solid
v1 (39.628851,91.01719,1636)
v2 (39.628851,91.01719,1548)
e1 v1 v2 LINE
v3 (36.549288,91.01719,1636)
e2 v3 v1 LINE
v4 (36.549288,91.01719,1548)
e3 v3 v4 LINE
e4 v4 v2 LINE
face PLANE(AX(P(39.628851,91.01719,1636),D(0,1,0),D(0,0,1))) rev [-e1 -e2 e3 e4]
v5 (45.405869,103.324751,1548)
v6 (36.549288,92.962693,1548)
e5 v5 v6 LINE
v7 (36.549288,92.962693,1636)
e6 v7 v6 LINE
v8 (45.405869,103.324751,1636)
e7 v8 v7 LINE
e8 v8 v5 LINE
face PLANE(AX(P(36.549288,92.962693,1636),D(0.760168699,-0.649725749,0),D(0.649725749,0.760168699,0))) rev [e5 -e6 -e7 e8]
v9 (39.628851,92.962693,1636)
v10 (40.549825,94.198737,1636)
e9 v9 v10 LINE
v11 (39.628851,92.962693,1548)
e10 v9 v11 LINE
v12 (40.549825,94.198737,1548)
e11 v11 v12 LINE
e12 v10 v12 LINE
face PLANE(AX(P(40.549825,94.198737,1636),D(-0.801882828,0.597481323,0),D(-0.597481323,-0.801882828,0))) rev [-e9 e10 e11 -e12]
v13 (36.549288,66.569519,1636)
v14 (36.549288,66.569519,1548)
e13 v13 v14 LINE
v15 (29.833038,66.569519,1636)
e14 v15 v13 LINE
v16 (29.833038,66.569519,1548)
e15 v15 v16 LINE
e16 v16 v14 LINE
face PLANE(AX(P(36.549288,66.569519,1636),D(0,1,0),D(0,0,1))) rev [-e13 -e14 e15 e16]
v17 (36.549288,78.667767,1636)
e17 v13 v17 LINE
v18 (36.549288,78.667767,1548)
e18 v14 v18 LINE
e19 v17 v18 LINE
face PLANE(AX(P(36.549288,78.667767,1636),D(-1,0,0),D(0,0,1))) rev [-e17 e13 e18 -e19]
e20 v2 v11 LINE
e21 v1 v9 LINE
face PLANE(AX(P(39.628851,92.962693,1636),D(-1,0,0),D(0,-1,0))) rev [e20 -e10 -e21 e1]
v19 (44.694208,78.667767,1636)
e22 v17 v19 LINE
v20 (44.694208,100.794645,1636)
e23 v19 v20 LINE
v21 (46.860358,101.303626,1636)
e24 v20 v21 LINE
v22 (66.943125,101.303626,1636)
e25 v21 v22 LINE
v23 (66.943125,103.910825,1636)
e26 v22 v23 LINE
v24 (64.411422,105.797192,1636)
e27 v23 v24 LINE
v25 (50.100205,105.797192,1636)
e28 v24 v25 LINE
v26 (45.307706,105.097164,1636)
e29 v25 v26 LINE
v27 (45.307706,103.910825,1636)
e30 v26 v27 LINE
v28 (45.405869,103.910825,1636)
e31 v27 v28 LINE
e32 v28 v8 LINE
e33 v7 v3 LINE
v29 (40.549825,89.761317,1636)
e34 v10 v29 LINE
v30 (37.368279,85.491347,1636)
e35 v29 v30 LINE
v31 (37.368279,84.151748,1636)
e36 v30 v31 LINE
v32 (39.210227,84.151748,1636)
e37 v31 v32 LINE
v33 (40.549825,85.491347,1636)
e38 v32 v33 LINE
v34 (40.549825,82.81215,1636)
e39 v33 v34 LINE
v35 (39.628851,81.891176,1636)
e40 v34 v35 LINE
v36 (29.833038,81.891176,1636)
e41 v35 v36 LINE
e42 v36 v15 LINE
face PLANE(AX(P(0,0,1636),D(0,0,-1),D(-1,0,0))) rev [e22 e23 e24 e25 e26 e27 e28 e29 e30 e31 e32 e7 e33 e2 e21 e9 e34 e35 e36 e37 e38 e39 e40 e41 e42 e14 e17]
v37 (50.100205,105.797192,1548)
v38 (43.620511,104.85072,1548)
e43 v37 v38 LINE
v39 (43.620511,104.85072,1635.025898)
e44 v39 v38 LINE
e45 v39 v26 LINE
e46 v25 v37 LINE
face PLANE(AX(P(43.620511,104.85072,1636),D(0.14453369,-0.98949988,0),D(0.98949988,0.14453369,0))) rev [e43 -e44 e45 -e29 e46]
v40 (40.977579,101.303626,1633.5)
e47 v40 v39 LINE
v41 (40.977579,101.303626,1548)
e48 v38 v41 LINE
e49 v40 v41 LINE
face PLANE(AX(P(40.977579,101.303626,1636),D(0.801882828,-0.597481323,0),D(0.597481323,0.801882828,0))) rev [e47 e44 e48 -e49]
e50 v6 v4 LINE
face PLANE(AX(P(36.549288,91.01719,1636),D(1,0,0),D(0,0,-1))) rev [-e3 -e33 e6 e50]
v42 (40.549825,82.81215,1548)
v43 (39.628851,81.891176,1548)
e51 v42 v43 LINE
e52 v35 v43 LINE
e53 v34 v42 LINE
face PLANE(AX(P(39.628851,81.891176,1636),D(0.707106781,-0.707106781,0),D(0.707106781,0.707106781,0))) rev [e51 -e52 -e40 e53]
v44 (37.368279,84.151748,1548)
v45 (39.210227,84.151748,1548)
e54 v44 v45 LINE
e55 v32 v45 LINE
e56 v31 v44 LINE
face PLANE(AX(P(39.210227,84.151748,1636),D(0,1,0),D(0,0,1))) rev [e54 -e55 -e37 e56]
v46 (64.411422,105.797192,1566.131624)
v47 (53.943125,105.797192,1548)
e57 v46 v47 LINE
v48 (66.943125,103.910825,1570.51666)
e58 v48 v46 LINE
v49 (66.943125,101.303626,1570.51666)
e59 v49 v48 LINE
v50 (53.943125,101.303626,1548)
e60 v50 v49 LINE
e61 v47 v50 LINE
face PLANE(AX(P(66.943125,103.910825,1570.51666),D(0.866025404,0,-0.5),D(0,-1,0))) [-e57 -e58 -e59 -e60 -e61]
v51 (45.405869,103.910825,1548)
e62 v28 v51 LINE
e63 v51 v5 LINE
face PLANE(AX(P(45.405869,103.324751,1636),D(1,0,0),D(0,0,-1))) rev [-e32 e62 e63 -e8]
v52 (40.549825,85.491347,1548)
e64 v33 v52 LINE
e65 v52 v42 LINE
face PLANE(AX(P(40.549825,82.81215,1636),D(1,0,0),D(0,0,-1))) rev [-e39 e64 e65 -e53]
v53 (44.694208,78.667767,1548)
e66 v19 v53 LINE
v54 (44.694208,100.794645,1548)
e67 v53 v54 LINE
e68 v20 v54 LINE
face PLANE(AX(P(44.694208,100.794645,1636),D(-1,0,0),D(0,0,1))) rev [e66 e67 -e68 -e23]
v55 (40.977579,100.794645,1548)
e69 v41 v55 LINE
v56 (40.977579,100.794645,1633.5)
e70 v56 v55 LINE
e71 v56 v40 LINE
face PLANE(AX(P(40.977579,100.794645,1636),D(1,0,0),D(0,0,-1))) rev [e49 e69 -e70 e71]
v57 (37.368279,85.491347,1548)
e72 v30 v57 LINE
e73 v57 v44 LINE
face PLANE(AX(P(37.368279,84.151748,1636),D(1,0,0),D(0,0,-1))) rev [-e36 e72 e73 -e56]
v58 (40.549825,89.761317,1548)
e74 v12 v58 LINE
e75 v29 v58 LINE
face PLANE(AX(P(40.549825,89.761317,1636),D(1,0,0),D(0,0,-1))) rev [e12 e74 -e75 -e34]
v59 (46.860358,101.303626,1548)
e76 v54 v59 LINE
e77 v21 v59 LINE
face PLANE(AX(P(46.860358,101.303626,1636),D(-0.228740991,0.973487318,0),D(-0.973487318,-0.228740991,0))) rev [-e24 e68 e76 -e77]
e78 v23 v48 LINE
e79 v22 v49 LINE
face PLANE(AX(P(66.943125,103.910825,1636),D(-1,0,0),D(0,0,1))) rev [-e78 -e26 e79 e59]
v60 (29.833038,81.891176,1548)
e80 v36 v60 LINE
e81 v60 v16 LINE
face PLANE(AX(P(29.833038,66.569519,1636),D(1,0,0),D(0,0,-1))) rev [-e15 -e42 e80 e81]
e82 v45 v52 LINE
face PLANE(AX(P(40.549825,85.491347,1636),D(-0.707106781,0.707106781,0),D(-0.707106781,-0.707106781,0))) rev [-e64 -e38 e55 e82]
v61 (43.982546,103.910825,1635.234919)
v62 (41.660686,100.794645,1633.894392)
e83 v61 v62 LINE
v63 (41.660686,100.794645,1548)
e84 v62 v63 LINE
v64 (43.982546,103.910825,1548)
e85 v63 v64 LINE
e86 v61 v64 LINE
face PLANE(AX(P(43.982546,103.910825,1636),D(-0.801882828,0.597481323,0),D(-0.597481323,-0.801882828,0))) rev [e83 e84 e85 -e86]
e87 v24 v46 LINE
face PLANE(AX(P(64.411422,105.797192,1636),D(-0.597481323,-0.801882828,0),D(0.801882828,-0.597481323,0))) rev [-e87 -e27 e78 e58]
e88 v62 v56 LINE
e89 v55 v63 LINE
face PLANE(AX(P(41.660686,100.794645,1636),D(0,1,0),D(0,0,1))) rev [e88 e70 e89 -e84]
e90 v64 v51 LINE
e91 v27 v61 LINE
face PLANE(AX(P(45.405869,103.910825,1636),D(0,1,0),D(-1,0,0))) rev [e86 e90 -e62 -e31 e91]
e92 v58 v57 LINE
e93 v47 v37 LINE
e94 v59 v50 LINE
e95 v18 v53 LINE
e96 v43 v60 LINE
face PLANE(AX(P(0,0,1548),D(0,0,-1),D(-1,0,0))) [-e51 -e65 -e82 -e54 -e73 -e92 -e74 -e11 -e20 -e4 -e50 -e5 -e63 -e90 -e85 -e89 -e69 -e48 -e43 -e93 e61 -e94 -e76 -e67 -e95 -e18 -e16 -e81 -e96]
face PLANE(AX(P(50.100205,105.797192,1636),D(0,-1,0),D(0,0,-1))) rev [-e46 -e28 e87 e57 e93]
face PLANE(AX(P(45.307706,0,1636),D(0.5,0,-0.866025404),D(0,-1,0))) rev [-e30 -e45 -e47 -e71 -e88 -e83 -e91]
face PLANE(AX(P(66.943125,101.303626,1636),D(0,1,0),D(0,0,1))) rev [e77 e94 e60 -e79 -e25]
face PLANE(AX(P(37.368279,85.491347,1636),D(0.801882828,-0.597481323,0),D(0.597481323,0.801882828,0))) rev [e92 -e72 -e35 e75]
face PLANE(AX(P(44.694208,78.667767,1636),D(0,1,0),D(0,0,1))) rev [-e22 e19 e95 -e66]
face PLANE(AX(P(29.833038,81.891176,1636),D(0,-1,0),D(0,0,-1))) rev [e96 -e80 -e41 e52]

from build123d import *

# Parameters (mm, degrees)
EXTRUDE_1_DEPTH  = 88
CHAMFER_1_SIZE   = 13
CHAMFER_1_SIZE2  = 22.516660498
CHAMFER_2_SIZE   = 4.330127019
CHAMFER_2_SIZE_2 = 2.5


with BuildPart() as part:
    # Эскиз1 → Бобышка-Вытянуть1 (new body)
    with BuildSketch(Plane.XY.offset(1548)):
        Polygon((36.549287829, 66.569518917), (29.833037542, 66.569518917), (29.833037542, 81.891176087), (39.628851143, 81.891176087), (40.549825071, 82.812150015), (40.549825071, 85.491346897), (39.21022663, 84.151748456), (37.368278773, 84.151748456), (37.368278773, 85.491346897), (40.549825071, 89.761316928), (40.549825071, 94.198736764), (39.628851143, 92.962692808), (39.628851143, 91.017190466), (36.549287829, 91.017190466), (36.549287829, 92.962692808), (45.40586942, 103.324751144), (45.40586942, 103.910825462), (43.982546076, 103.910825462), (41.660685836, 100.794644613), (40.977578624, 100.794644613), (40.977578624, 101.303626458), (43.620510787, 104.850719623), (50.100205342, 105.797191861), (64.411422303, 105.797191861), (66.943124576, 103.910825462), (66.943124576, 101.303626458), (46.860358064, 101.303626458), (44.694207748, 100.794644613), (44.694207748, 78.667767338), (36.549287829, 78.667767338), align=None)
    extrude(amount=EXTRUDE_1_DEPTH)

    # Фаска1
    chamfer_1_edges = [part.edges().sort_by_distance(p)[0] for p in [
        (66.943124576, 102.60722596, 1548),
    ]]
    chamfer_1_side = [part.faces().sort_by_distance(p)[0] for p in [
        (43.066294454, 88.644441119, 1548),
    ]]
    chamfer(chamfer_1_edges, length=CHAMFER_1_SIZE, length2=CHAMFER_1_SIZE2, reference=chamfer_1_side[0])

    # Фаска2
    # the kernel refuses this chamfer: 4.330127019, 2.5 mm, written as the material it takes off along each edge
    with BuildSketch(Plane(origin=(40.977578624, 89.592234687, 1636), x_dir=(0.9998132206222081, 0, 0.01932676561269257), z_dir=(0, 1, 0))) as chamfer_2_piece_1_section:
        Polygon((CHAMFER_2_SIZE * 0.999813220604, CHAMFER_2_SIZE * 0.0193267656123), (-CHAMFER_2_SIZE_2 * 0.0193267656127, CHAMFER_2_SIZE_2 * 0.999813220622), (0, 0), align=None)
    chamfer_2_piece_1 = extrude(amount=22.913801697, mode=Mode.PRIVATE)
    chamfer_2_piece_1 = split(chamfer_2_piece_1, bisect_by=Plane(origin=(45.427089539, 103.349578342, 1635.744871049), z_dir=(-0.7601686994393885, 0.6497257485990753, 0)), keep=Keep.TOP, mode=Mode.PRIVATE)
    add(chamfer_2_piece_1, mode=Mode.SUBTRACT)


solid = part.part
